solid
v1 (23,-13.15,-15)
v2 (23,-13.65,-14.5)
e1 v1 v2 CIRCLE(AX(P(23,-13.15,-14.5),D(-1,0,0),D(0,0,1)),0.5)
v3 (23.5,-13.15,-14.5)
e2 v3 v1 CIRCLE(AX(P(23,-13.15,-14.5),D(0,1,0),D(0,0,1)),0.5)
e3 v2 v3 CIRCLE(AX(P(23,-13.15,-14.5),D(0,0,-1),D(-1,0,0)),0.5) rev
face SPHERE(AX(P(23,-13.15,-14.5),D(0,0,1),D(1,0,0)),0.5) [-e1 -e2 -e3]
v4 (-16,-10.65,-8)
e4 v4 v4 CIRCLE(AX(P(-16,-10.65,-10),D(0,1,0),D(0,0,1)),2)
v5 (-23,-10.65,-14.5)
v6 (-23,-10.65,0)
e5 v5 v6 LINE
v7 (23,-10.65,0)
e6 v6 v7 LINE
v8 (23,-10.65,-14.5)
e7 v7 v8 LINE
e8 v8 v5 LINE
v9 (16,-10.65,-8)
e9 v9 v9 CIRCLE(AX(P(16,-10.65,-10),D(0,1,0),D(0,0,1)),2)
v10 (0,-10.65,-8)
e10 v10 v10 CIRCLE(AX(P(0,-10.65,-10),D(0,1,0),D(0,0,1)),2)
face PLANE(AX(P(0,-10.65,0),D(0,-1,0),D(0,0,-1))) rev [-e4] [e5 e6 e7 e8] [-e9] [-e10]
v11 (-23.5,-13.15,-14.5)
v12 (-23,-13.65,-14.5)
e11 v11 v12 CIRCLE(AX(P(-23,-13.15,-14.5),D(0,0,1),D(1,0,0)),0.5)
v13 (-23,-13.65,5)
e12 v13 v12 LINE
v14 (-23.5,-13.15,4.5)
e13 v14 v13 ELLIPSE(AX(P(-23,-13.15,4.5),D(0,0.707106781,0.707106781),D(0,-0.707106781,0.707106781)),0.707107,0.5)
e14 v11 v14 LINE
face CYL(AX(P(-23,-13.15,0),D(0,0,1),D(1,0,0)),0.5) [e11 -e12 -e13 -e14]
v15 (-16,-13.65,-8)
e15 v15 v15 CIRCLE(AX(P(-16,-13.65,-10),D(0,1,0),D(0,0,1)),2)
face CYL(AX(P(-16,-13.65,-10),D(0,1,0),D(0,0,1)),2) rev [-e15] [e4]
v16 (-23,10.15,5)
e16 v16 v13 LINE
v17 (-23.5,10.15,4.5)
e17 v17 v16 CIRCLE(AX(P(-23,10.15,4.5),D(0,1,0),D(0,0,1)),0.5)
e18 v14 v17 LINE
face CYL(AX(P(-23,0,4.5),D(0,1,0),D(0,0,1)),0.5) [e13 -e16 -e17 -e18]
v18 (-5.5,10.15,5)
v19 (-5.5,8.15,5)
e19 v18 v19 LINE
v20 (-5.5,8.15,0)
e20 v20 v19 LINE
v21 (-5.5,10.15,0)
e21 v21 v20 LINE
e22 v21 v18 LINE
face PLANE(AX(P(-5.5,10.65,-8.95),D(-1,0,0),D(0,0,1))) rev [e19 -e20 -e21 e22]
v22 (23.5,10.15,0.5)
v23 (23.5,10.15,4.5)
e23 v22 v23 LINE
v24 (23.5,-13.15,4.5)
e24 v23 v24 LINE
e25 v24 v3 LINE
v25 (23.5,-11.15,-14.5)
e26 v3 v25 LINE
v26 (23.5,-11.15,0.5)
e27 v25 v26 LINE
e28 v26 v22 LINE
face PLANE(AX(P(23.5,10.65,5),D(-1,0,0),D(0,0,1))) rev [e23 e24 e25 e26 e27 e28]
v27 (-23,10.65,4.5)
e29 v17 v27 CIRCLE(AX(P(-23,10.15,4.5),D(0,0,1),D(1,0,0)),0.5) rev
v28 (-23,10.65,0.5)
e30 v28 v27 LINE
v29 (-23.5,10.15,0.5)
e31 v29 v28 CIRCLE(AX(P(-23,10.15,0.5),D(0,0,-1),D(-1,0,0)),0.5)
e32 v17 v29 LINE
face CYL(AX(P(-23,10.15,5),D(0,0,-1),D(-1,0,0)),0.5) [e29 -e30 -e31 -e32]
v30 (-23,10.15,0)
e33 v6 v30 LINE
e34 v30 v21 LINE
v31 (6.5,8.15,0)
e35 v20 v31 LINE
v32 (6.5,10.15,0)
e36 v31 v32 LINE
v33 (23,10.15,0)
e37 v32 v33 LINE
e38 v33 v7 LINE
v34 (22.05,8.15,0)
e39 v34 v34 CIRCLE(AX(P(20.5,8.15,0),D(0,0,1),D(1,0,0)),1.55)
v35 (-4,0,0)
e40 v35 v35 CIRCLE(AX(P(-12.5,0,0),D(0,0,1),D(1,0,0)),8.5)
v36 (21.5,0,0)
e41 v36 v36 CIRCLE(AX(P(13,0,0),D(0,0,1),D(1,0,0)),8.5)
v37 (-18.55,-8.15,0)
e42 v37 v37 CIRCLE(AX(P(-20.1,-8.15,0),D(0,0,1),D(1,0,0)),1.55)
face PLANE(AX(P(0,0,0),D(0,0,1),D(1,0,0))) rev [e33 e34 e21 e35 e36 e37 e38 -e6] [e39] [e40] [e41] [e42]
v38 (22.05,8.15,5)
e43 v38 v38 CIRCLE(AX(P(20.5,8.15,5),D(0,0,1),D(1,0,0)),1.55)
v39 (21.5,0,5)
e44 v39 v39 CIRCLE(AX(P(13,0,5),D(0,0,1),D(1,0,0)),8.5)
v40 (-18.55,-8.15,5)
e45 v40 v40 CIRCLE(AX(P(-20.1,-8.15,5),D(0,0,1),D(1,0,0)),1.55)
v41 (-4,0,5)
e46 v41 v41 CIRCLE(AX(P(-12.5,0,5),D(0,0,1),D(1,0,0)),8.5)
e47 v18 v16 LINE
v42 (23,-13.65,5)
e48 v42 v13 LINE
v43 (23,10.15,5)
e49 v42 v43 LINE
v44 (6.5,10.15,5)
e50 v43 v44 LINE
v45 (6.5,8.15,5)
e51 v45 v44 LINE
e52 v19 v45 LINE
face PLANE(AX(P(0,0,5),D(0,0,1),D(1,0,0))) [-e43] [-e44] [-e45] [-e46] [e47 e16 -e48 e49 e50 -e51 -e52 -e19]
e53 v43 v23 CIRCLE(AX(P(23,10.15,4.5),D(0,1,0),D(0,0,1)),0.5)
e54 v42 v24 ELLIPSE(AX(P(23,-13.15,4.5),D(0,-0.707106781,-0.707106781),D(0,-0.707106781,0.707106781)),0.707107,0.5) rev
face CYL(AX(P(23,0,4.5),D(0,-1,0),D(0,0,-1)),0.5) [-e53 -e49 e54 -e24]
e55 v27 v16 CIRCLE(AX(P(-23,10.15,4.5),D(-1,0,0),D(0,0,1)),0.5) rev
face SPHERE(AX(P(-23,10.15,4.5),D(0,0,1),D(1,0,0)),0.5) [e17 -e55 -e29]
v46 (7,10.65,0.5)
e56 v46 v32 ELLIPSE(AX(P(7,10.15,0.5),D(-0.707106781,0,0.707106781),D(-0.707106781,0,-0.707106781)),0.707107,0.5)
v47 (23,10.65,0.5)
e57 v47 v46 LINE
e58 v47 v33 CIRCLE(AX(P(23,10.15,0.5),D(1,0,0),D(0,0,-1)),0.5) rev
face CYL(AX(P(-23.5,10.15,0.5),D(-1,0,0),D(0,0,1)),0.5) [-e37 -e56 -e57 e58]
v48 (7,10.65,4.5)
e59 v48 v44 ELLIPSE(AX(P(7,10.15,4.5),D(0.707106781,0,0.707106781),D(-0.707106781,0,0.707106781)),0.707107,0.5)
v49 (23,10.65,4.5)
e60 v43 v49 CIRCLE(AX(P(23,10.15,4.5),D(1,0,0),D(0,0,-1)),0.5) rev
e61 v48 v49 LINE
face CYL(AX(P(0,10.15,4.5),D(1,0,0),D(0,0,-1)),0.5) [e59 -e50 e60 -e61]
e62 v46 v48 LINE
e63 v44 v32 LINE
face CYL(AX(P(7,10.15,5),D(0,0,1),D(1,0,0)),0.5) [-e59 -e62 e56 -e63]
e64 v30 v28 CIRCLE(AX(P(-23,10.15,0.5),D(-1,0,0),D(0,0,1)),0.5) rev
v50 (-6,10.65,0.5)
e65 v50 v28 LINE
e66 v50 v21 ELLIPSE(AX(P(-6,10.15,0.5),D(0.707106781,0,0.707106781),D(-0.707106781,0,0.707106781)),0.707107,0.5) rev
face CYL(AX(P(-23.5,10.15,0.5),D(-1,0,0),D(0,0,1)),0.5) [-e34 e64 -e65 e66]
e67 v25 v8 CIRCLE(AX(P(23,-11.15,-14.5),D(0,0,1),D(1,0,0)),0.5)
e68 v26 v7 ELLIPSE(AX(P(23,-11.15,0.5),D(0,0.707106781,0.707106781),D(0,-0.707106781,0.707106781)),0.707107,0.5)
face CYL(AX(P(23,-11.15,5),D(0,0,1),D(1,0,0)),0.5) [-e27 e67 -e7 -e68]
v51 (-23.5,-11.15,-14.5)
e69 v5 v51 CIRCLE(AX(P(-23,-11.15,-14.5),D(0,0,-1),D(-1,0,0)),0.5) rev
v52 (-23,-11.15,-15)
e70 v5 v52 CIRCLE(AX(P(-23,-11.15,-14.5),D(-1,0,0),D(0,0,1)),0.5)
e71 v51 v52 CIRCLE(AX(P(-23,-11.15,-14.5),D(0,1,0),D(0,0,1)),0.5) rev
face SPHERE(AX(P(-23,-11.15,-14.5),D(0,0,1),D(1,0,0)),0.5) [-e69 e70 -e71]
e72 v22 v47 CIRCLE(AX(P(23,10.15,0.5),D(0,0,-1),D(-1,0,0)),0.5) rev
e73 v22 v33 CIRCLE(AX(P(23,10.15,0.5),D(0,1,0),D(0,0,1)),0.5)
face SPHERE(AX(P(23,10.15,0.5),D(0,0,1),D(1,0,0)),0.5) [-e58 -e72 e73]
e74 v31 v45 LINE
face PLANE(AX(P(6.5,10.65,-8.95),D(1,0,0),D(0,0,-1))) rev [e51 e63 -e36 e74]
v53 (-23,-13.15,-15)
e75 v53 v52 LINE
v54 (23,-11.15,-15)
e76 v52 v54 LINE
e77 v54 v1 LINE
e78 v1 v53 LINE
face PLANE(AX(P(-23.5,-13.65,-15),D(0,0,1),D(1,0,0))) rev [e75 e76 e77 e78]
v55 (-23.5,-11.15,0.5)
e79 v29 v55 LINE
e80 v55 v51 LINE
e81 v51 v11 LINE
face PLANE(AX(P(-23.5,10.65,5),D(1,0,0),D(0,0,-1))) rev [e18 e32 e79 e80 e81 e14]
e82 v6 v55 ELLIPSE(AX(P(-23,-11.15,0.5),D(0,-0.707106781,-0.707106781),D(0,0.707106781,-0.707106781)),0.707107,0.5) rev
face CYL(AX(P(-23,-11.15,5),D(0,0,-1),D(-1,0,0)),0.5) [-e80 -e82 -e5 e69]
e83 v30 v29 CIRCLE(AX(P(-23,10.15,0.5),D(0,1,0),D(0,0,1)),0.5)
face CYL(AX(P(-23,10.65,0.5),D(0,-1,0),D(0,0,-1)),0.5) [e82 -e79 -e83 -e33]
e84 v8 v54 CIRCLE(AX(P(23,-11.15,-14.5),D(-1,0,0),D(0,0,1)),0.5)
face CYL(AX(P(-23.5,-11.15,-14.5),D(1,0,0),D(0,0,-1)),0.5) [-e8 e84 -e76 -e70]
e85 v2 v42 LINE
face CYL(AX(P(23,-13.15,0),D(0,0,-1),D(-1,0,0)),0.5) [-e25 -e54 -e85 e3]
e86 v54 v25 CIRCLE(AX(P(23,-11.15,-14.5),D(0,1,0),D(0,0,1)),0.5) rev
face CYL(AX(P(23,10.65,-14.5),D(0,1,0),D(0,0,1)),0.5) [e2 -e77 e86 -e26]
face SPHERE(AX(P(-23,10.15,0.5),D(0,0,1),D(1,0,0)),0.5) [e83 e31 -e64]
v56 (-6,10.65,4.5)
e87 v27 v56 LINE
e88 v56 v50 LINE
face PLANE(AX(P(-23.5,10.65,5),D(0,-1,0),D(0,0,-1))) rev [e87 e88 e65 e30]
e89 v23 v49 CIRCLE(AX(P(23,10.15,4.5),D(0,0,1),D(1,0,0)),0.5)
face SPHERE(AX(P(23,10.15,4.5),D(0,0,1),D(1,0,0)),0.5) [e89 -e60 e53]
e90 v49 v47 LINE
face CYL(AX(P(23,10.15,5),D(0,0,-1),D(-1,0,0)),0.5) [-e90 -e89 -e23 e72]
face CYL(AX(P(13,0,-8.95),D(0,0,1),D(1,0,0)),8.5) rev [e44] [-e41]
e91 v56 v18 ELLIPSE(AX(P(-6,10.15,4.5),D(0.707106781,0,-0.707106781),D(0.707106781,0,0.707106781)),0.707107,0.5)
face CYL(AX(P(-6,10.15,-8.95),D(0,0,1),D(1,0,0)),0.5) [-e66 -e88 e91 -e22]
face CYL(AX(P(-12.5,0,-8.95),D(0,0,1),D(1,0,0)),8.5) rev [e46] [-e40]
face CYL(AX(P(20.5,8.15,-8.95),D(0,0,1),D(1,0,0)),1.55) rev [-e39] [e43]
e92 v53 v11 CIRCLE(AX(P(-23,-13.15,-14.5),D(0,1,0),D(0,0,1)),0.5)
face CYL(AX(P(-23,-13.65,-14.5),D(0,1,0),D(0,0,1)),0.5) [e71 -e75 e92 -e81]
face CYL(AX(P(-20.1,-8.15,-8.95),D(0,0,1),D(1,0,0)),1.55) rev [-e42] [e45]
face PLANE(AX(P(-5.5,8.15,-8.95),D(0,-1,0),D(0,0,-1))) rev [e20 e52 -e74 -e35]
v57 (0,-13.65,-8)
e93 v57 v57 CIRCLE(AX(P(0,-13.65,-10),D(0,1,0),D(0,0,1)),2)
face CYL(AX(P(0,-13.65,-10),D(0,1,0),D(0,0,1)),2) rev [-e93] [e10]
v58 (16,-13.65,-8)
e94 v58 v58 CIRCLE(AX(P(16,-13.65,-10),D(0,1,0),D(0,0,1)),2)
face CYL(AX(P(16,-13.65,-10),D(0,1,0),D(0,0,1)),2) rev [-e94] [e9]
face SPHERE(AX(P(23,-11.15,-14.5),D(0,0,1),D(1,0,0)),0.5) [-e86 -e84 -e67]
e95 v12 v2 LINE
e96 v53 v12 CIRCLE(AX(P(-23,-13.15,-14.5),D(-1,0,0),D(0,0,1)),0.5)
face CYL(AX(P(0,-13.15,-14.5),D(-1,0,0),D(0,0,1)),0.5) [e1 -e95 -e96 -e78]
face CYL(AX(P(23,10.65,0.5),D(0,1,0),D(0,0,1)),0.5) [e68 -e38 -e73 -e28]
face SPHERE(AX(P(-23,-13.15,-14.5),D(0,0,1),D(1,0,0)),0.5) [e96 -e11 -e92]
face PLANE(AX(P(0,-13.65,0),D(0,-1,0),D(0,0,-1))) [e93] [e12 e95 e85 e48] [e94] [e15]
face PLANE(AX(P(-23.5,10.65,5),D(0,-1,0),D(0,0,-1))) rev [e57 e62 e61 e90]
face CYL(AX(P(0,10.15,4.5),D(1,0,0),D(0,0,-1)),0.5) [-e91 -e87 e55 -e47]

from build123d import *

# Parameters (mm, degrees)
SKETCH_1_W          = 47
SKETCH_1_H          = 21.3
EXTRUDE_1_DEPTH     = 5
SKETCH_2_R          = 1.55
SKETCH_2_R_2        = 8.5
CUT_EXTRUDE_1_DEPTH = 13.95
SKETCH_7_W          = 47
SKETCH_7_H          = 20
EXTRUDE_3_DEPTH     = 3
SKETCH_3_W          = 12
SKETCH_3_H          = 2.5
CUT_EXTRUDE_2_DEPTH = 13.95
FILLET_4_R          = 0.5
SKETCH_11_R         = 2
CUT_EXTRUDE_4_DEPTH = 3
FILLET_5_R          = 0.5


with BuildPart() as part:
    # 草圖1 → 填料-伸長1 (new body)
    with BuildSketch(Plane.XY):
        Rectangle(SKETCH_1_W, SKETCH_1_H)
    extrude(amount=EXTRUDE_1_DEPTH)

    # 草圖2 → 除料-伸長1 (cut)
    with BuildSketch(Plane.XY.offset(5)):
        with Locations((-20.1, -8.15)):
            Circle(SKETCH_2_R)
        with Locations((20.5, 8.15)):
            Circle(SKETCH_2_R)
        with Locations((-12.5, 0)):
            Circle(SKETCH_2_R_2)
        with Locations((13, 0)):
            Circle(SKETCH_2_R_2)
    extrude(amount=-CUT_EXTRUDE_1_DEPTH, mode=Mode.SUBTRACT)

    # 草圖7 → 填料-伸長3 (add)
    with BuildSketch(Plane.XZ.offset(10.65)):
        with Locations((0, -5)):
            Rectangle(SKETCH_7_W, SKETCH_7_H)
    extrude(amount=EXTRUDE_3_DEPTH)

    # 草圖3 → 除料-伸長2 (cut)
    with BuildSketch(Plane.XY.offset(5)):
        with Locations((0.5, 9.4)):
            Rectangle(SKETCH_3_W, SKETCH_3_H)
    extrude(amount=-CUT_EXTRUDE_2_DEPTH, mode=Mode.SUBTRACT)

    # 圓角4
    fillet_4_edges = [part.edges().sort_by_distance(p)[0] for p in [
        (15, 10.65, 5),
        (6.5, 10.65, 2.5),
        (15, 10.65, 0),
        (-14.5, 10.65, 0),
        (-5.5, 10.65, 2.5),
        (-14.5, 10.65, 5),
        (-23.5, 10.65, 2.5),
        (-23.5, -1.5, 5),
        (-23.5, -13.65, -5),
        (-23.5, -12.15, -15),
        (-23.5, -10.65, -7.5),
        (-23.5, 0, 0),
        (23.5, -10.65, -7.5),
        (23.5, -12.15, -15),
        (23.5, -13.65, -5),
        (23.5, -1.5, 5),
        (23.5, 10.65, 2.5),
        (23.5, 0, 0),
    ]]
    fillet(fillet_4_edges, radius=FILLET_4_R)

    # 草圖11 → 除料-伸長4 (cut)
    with BuildSketch(Plane(origin=(0, -10.65, 0), x_dir=(1, 0, 0), z_dir=(0, 1, 0))):
        with Locations(Location((0, 10, 0), (0, 0, 270))):
            Circle(SKETCH_11_R)
        with Locations(Location((16, 10, 0), (0, 0, 270))):
            Circle(SKETCH_11_R)
        with Locations(Location((-16, 10, 0), (0, 0, 270))):
            Circle(SKETCH_11_R)
    extrude(amount=-CUT_EXTRUDE_4_DEPTH, mode=Mode.SUBTRACT)

    # 圓角5
    # the kernel refuses this fillet: 0.5 mm, written as the material it takes off along each edge
    with BuildSketch(Plane(origin=(-23, -13.15, -14.5), x_dir=(0, 0, -1), z_dir=(0, -1, 0))) as fillet_5_piece_1_section:
        Polygon((0, 0), (FILLET_5_R, 0), (FILLET_5_R, -FILLET_5_R), (0, -FILLET_5_R), align=None)
    fillet_5_piece_1 = extrude(amount=FILLET_5_R, mode=Mode.PRIVATE)
    fillet_5_piece_1 = fillet_5_piece_1 - Plane(origin=(-23, -13.15, -14.5), x_dir=(0.7071067811865475, 0, 0.7071067811865475), z_dir=(0, -1, 0)) * Sphere(FILLET_5_R, mode=Mode.PRIVATE)
    add(fillet_5_piece_1, mode=Mode.SUBTRACT)
    with BuildSketch(Plane(origin=(-23, -11.15, -14.5), x_dir=(0, 0, -1), z_dir=(0, 1, 0))) as fillet_5_piece_2_section:
        Polygon((0, 0), (FILLET_5_R, 0), (FILLET_5_R, FILLET_5_R), (0, FILLET_5_R), align=None)
    fillet_5_piece_2 = extrude(amount=FILLET_5_R, mode=Mode.PRIVATE)
    fillet_5_piece_2 = fillet_5_piece_2 - Plane(origin=(-23, -11.15, -14.5), x_dir=(0.7071067811865475, 0, 0.7071067811865475), z_dir=(0, 1, 0)) * Sphere(FILLET_5_R, mode=Mode.PRIVATE)
    add(fillet_5_piece_2, mode=Mode.SUBTRACT)
    with BuildSketch(Plane(origin=(23, -11.15, -14.5), x_dir=(0, 0, -1), z_dir=(0, 1, 0))) as fillet_5_piece_3_section:
        Polygon((0, 0), (FILLET_5_R, 0), (FILLET_5_R, -FILLET_5_R), (0, -FILLET_5_R), align=None)
    fillet_5_piece_3 = extrude(amount=FILLET_5_R, mode=Mode.PRIVATE)
    fillet_5_piece_3 = fillet_5_piece_3 - Plane(origin=(23, -11.15, -14.5), x_dir=(-0.7071067811865475, 0, 0.7071067811865475), z_dir=(0, 1, 0)) * Sphere(FILLET_5_R, mode=Mode.PRIVATE)
    add(fillet_5_piece_3, mode=Mode.SUBTRACT)
    with BuildSketch(Plane(origin=(23, -13.15, -14.5), x_dir=(0, 0, -1), z_dir=(0, -1, 0))) as fillet_5_piece_4_section:
        Polygon((0, 0), (FILLET_5_R, 0), (FILLET_5_R, FILLET_5_R), (0, FILLET_5_R), align=None)
    fillet_5_piece_4 = extrude(amount=FILLET_5_R, mode=Mode.PRIVATE)
    fillet_5_piece_4 = fillet_5_piece_4 - Plane(origin=(23, -13.15, -14.5), x_dir=(-0.7071067811865475, 0, 0.7071067811865475), z_dir=(0, -1, 0)) * Sphere(FILLET_5_R, mode=Mode.PRIVATE)
    add(fillet_5_piece_4, mode=Mode.SUBTRACT)
    with BuildSketch(Plane(origin=(-23, -13.65, -15), x_dir=(0, 0, 1), z_dir=(1, 0, 0))) as fillet_5_piece_5:
        with BuildLine():
            CenterArc((FILLET_5_R, -FILLET_5_R), FILLET_5_R, 90, 90)
            Line((0, -FILLET_5_R), (0, 0))
            Line((0, 0), (FILLET_5_R, 0))
        make_face()
    extrude(amount=46, mode=Mode.SUBTRACT)
    with BuildSketch(Plane(origin=(-23, -10.65, -15), x_dir=(0, 0, 1), z_dir=(1, 0, 0))) as fillet_5_piece_6:
        with BuildLine():
            CenterArc((FILLET_5_R, FILLET_5_R), FILLET_5_R, 180, 90)
            Line((0, FILLET_5_R), (0, 0))
            Line((0, 0), (FILLET_5_R, 0))
        make_face()
    extrude(amount=46, mode=Mode.SUBTRACT)


solid = part.part
